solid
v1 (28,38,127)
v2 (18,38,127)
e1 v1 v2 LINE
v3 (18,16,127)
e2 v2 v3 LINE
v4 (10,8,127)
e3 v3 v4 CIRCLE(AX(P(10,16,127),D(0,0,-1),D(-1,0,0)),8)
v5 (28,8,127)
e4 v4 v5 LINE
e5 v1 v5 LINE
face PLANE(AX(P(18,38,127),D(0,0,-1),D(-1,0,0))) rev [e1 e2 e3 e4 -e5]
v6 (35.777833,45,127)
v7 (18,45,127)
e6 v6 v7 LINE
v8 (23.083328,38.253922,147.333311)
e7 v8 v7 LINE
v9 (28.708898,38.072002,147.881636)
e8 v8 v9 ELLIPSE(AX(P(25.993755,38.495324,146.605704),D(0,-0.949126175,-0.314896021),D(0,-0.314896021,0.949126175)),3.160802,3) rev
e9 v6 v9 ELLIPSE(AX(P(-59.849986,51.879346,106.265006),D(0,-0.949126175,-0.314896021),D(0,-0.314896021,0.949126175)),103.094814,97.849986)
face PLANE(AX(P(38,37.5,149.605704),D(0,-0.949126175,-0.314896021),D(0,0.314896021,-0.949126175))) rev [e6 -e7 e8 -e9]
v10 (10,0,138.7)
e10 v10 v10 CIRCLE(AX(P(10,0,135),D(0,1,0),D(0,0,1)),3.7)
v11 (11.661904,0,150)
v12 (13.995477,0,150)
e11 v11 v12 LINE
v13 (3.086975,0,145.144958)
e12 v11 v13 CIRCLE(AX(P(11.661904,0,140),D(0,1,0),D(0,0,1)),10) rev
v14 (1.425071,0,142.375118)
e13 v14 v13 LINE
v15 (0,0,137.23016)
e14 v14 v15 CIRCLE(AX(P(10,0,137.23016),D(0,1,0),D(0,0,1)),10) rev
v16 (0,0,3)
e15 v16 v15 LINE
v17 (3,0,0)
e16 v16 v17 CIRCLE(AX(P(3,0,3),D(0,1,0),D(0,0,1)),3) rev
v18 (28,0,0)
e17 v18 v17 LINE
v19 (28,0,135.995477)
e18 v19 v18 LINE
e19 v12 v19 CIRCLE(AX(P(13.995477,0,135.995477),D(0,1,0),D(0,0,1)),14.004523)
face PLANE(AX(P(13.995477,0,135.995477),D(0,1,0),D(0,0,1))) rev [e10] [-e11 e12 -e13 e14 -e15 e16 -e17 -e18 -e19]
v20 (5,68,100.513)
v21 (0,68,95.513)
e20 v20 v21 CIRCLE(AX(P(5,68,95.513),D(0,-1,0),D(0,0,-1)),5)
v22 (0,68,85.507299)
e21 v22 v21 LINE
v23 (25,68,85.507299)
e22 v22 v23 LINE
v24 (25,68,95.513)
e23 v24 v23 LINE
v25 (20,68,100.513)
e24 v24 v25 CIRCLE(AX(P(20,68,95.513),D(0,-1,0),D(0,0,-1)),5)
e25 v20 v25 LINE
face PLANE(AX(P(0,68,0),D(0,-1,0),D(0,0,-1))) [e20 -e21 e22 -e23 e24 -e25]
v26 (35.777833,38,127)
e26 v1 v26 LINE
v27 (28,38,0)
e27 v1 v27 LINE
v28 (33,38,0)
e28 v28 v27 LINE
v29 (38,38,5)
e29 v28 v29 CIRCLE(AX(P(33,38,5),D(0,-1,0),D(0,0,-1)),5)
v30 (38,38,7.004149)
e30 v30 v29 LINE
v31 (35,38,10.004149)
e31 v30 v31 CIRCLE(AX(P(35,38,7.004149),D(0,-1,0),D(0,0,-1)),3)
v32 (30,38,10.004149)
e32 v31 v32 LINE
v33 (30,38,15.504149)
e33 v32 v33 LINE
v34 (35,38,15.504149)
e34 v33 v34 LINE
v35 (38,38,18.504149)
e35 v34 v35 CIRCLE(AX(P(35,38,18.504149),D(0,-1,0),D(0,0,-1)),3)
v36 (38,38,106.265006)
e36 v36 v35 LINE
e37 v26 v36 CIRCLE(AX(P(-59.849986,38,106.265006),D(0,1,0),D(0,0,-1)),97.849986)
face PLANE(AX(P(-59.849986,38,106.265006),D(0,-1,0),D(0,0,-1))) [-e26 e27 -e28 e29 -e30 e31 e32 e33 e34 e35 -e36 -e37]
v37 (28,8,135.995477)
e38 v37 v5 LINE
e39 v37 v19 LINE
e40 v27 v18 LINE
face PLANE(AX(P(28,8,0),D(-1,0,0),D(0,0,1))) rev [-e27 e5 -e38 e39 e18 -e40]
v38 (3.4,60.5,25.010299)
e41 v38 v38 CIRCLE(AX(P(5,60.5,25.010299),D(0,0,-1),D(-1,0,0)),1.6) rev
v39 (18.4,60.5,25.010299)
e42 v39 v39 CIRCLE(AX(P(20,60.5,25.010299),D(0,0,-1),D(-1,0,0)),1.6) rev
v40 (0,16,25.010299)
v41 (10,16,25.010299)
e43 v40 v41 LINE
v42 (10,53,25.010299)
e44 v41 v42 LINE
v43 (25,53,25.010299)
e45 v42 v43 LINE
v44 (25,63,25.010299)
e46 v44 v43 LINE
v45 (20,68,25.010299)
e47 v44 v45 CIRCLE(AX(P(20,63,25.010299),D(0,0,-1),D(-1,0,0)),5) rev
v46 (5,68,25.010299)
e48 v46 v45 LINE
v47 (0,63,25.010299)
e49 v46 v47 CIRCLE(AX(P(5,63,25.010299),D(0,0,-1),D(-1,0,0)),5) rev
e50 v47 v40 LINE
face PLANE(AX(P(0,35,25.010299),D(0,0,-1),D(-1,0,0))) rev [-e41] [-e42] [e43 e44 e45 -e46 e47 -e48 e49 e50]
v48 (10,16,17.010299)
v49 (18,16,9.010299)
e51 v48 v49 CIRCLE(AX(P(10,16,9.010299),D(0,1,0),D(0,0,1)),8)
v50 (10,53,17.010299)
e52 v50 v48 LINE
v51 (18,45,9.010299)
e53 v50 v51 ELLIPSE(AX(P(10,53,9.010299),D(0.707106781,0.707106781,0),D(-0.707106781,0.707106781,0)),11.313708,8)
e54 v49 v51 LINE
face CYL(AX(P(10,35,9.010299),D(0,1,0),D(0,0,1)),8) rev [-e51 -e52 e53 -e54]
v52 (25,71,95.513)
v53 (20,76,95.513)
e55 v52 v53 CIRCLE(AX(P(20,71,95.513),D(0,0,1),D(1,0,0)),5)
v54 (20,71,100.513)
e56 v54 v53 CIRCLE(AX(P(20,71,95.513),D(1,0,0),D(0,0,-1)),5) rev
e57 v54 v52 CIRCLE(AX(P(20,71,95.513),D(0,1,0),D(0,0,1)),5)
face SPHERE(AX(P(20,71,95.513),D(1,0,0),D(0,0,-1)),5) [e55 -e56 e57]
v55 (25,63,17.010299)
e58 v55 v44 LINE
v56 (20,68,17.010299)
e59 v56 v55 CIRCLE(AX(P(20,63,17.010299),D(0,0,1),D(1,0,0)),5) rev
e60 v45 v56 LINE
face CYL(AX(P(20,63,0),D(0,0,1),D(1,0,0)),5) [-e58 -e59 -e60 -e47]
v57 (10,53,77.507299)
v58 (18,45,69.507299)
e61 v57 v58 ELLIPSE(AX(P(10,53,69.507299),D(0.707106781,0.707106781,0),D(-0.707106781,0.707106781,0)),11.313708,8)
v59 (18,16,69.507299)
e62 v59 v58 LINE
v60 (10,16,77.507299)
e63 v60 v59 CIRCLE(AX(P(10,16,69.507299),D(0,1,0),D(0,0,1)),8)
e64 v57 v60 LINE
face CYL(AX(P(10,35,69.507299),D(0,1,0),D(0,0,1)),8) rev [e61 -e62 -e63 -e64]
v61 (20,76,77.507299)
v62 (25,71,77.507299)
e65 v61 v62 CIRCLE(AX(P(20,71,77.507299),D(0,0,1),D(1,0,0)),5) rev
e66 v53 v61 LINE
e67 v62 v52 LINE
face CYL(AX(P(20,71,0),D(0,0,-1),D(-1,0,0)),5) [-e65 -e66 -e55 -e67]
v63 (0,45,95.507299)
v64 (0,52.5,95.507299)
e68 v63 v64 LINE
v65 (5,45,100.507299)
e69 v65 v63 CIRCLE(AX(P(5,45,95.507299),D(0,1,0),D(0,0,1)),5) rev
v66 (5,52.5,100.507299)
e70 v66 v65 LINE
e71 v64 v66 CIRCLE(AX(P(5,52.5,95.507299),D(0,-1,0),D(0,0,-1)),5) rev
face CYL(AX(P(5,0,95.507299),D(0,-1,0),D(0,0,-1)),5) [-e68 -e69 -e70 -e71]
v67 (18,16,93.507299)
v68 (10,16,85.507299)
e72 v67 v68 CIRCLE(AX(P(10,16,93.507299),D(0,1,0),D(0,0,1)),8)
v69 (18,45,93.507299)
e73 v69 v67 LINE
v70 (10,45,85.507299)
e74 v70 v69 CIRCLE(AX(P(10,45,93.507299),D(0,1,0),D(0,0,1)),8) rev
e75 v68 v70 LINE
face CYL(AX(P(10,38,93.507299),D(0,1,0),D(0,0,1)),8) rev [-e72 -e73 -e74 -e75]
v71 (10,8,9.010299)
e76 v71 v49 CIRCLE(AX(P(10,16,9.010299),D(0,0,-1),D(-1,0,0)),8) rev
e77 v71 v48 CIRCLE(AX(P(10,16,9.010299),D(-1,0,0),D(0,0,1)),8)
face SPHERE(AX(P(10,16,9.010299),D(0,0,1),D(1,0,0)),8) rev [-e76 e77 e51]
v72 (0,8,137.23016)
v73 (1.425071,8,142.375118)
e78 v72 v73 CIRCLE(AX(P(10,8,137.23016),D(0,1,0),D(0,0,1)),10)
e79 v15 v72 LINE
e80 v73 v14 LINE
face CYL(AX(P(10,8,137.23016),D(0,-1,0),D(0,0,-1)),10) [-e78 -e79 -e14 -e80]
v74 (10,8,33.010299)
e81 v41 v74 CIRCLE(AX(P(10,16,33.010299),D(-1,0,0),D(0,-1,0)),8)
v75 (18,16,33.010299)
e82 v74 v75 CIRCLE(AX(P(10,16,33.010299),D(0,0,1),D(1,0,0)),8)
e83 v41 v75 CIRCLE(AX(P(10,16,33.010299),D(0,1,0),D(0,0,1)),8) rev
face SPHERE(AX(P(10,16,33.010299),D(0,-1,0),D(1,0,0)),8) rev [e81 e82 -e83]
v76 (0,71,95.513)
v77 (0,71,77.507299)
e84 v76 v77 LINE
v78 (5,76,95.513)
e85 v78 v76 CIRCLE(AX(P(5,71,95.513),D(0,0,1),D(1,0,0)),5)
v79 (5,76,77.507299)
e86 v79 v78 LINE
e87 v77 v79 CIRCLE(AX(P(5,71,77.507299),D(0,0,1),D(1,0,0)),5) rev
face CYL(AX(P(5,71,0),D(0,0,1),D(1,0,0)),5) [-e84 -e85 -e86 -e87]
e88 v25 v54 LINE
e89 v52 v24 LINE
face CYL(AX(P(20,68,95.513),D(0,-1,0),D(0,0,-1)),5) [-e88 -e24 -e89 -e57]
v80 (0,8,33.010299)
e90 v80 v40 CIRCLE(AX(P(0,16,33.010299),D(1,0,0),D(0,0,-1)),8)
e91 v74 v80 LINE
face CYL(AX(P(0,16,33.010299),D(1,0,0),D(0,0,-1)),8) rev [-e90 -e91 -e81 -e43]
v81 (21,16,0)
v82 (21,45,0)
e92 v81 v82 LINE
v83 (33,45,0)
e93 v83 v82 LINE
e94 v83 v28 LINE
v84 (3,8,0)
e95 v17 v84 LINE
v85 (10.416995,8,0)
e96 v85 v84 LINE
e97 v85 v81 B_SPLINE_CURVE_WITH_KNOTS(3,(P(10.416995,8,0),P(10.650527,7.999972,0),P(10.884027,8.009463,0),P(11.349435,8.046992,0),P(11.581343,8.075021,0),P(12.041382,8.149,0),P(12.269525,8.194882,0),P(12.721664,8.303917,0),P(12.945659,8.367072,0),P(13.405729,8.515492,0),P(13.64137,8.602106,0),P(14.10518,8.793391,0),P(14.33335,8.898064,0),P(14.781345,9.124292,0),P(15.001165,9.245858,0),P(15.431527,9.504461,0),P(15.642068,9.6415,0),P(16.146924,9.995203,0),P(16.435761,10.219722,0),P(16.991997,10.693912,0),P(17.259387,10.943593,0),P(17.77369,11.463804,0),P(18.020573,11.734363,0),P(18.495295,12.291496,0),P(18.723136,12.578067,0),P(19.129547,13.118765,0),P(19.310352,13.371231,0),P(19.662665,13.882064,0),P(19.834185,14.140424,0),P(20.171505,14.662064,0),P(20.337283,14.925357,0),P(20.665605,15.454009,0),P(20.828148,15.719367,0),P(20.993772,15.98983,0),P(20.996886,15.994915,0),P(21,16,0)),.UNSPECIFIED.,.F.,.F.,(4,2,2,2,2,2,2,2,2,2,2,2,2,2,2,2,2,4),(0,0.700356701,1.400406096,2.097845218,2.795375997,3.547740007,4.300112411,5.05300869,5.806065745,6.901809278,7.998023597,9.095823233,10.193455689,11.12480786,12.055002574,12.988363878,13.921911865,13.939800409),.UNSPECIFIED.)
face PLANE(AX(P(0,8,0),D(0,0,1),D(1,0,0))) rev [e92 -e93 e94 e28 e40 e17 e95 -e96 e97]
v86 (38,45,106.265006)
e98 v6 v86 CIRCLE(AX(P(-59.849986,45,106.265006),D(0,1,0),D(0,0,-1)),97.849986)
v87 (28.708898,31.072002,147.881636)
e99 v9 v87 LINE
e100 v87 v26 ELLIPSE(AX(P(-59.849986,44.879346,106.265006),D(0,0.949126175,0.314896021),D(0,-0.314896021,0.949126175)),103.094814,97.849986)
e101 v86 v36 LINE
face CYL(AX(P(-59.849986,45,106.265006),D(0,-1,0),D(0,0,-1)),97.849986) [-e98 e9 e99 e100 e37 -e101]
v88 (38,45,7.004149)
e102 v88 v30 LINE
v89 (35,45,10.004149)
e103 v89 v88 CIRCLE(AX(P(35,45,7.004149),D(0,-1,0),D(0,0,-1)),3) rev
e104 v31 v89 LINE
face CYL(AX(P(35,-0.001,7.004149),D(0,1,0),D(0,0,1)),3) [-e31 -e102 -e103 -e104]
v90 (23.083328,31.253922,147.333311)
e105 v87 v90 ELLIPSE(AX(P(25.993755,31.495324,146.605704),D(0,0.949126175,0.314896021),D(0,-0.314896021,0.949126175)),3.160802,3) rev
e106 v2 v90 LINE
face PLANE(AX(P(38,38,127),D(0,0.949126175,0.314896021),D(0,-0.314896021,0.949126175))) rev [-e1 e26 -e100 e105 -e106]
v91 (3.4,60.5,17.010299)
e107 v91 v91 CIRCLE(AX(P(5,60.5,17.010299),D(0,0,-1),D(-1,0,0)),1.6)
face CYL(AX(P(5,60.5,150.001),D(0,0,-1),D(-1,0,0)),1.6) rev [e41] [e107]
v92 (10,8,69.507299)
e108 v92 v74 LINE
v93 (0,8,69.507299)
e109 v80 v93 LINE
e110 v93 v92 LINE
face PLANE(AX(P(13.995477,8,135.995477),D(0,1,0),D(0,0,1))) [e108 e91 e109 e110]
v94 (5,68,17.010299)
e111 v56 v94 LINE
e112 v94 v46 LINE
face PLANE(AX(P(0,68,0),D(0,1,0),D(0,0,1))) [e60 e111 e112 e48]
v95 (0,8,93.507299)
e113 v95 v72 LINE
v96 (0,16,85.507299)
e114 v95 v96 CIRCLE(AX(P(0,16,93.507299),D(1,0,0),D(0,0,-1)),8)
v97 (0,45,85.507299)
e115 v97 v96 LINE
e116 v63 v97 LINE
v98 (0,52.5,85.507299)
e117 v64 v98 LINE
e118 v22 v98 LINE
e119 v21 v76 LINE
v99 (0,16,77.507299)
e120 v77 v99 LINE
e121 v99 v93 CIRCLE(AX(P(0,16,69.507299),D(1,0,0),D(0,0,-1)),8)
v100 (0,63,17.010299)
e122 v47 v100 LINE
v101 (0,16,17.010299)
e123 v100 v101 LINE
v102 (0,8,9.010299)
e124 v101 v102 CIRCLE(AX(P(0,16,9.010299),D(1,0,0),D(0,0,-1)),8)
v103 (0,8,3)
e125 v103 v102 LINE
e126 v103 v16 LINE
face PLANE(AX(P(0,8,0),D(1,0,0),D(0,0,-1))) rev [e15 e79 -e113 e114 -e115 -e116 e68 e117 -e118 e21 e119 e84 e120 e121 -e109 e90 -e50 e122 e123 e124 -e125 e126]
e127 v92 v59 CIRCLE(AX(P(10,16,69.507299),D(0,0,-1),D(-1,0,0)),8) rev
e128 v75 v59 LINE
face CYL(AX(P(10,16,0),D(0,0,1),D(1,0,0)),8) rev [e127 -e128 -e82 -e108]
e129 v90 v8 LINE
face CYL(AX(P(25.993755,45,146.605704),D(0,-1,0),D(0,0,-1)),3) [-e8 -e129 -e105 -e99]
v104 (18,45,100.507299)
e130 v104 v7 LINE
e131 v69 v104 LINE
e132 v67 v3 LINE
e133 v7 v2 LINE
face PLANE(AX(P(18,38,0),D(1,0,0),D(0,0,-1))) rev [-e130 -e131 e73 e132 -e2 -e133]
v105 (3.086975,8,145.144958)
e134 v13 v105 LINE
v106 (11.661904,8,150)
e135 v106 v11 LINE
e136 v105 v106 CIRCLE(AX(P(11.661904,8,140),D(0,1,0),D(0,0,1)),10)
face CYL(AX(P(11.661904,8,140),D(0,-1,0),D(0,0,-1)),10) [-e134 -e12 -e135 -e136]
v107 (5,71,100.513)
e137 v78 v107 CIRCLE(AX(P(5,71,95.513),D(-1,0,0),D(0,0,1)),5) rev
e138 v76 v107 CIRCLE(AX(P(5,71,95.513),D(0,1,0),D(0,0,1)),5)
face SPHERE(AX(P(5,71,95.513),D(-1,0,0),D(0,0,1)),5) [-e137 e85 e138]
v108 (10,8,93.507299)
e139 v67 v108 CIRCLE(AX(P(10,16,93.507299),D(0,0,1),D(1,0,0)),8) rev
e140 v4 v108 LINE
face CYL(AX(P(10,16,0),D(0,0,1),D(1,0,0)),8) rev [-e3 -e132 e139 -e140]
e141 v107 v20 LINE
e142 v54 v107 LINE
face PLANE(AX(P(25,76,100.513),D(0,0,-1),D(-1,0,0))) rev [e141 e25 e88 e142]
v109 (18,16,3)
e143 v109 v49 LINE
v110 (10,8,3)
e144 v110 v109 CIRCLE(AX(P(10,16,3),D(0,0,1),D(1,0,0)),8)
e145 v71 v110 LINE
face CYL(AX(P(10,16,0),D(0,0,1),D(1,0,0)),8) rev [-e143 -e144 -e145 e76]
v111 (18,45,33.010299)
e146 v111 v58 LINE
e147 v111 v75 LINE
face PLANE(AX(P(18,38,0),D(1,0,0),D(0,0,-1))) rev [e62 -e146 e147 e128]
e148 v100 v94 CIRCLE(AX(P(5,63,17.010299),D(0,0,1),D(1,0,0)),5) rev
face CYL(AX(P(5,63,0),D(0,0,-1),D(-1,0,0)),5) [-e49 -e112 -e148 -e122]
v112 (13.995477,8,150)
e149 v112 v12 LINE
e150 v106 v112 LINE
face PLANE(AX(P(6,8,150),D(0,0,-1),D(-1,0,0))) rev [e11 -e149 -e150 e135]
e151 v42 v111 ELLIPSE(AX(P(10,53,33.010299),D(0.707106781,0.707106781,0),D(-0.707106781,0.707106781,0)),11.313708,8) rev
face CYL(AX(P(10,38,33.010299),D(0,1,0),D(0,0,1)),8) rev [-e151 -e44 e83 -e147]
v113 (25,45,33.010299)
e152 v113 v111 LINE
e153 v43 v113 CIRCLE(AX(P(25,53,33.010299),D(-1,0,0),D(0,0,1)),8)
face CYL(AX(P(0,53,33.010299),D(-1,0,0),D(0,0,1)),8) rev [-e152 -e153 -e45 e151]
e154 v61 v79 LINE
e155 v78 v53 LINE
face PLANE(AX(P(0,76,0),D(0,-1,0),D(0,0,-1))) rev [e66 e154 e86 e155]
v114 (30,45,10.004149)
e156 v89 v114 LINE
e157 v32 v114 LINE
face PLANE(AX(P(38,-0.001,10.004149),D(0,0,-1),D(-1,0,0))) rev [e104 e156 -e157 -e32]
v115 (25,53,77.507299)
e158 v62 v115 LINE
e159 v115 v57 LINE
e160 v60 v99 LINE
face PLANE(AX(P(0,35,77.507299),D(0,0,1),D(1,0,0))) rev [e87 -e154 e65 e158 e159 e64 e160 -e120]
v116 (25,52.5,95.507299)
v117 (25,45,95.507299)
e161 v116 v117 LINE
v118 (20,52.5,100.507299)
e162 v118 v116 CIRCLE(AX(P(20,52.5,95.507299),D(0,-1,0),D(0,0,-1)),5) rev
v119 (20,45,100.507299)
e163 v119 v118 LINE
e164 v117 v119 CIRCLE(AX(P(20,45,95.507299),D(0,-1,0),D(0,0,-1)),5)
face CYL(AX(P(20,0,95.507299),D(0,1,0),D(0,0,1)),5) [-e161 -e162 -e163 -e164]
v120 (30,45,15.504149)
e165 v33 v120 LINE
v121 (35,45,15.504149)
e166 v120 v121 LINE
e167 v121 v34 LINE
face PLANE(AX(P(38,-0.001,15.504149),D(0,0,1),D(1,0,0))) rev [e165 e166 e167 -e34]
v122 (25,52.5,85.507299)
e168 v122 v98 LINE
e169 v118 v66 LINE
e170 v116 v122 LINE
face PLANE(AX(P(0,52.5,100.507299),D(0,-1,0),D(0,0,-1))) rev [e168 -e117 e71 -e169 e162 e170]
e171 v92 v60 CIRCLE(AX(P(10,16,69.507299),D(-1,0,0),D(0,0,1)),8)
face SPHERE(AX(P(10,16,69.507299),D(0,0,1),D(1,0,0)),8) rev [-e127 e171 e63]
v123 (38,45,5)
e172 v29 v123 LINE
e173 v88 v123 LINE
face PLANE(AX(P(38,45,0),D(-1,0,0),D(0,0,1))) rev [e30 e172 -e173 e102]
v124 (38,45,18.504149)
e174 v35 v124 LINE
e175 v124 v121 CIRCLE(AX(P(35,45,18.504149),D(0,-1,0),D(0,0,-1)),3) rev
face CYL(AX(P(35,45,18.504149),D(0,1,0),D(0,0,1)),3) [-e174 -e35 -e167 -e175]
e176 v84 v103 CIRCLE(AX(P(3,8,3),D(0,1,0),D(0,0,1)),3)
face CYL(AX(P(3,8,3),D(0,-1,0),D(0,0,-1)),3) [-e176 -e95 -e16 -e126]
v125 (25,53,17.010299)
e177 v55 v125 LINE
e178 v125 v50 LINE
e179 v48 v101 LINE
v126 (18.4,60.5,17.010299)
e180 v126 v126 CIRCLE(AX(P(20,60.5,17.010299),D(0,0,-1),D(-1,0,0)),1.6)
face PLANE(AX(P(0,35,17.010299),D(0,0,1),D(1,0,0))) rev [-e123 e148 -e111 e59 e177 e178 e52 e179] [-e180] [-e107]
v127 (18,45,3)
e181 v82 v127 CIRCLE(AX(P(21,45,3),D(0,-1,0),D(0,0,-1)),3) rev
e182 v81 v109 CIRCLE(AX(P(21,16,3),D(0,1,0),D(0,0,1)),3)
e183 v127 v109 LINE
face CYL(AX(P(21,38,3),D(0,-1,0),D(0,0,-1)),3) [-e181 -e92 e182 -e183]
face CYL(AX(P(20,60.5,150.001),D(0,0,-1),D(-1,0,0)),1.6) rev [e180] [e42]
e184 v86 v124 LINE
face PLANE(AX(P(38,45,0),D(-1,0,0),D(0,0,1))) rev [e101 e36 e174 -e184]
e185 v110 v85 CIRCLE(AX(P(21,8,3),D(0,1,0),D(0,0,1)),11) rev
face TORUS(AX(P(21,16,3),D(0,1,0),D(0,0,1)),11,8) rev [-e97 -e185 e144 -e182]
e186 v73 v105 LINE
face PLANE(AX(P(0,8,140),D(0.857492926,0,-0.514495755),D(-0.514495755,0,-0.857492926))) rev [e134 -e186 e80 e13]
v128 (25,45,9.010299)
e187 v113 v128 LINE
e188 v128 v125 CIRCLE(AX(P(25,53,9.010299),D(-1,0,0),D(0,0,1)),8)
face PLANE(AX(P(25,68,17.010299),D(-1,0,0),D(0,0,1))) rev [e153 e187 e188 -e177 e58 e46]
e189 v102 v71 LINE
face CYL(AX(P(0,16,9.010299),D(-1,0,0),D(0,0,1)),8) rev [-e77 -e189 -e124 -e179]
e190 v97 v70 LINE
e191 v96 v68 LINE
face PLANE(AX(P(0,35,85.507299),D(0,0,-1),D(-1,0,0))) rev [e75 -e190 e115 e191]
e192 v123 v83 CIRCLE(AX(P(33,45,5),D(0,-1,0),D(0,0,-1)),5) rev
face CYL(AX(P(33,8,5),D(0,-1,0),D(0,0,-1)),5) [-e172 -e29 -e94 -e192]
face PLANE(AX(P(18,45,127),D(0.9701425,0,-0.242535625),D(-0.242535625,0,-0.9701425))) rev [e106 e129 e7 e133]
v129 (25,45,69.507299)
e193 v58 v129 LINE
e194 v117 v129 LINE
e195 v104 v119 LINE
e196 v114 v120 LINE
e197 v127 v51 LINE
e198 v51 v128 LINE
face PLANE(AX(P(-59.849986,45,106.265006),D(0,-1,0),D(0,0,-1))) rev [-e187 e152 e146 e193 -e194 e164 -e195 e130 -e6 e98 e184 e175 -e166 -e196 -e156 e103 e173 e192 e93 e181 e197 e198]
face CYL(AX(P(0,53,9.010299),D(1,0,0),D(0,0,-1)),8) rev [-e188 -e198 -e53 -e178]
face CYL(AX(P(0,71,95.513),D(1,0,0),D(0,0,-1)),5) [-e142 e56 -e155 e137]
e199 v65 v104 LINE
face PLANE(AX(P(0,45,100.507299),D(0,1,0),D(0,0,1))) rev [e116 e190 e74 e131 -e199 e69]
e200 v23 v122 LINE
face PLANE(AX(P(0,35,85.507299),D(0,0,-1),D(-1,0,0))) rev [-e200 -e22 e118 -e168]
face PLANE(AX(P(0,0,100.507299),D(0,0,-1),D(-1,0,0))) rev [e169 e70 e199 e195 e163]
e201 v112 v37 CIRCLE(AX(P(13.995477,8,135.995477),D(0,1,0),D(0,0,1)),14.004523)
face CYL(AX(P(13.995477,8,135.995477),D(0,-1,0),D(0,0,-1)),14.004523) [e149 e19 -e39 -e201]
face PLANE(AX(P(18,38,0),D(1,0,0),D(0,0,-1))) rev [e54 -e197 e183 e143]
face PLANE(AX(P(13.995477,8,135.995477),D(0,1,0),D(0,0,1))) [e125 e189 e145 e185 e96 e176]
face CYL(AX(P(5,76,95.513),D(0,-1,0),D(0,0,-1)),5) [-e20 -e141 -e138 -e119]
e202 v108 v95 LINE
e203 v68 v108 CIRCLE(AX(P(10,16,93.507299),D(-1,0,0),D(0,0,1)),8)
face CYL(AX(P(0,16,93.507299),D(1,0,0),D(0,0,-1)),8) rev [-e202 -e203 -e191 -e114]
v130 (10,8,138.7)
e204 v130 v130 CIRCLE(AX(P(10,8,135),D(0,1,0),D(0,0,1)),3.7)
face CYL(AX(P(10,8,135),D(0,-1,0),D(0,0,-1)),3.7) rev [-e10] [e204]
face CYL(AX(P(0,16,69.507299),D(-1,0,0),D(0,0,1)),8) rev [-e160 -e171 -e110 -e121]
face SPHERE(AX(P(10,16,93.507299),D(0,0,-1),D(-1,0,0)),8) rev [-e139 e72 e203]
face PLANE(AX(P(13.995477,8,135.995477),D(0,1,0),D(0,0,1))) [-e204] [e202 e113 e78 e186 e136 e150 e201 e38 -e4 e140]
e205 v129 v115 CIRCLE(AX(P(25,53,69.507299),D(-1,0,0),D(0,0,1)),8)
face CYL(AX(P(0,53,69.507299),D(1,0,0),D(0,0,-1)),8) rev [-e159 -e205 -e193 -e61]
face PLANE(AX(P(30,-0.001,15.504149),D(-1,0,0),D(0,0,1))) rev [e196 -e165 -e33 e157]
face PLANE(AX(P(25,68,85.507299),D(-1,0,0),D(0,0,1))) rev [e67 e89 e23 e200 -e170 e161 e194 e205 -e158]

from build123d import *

# Parameters (mm, degrees)
SKETCH1_R           = 3.7
BOSS_EXTRUDE1_DEPTH = 8
FILLET1_R           = 10
SKETCH2_W           = 10
SKETCH2_H           = 127
BOSS_EXTRUDE2_DEPTH = 30
BOSS_EXTRUDE3_DEPTH = 7
FILLET2_R           = 3
SKETCH4_W           = 18
SKETCH4_H           = 8
BOSS_EXTRUDE4_DEPTH = 27
SKETCH5_W           = 25
SKETCH5_H           = 8
BOSS_EXTRUDE5_DEPTH = 33
SKETCH6_W           = 25
SKETCH6_H           = 23.005701243
BOSS_EXTRUDE6_DEPTH = 8
SKETCH7_W           = 25
SKETCH7_H           = 7.5
BOSS_EXTRUDE7_DEPTH = 15
CUT_EXTRUDE1_REACH  = 159.817
SKETCH8_R           = 1.6
FILLET3_R           = 8
FILLET4_R           = 5
CUT_EXTRUDE2_REACH  = 163.149
SKETCH9_W           = 8
SKETCH9_H           = 5.5
FILLET7_R           = 3
BOSS_EXTRUDE8_DEPTH = 10
CUT_EXTRUDE3_START  = -17.777833
CUT_EXTRUDE3_DEPTH  = 17.777833


with BuildPart() as part:
    # Sketch1 → Boss-Extrude1 (new body)
    with BuildSketch(Plane(origin=(0, 0, 0), x_dir=(1, 0, 0), z_dir=(0, 1, 0))):
        with BuildLine():
            Line((0, 0), (0, -140))
            Line((0, -140), (6, -150))
            Line((6, -150), (13.995477091, -150))
            ThreePointArc((13.995477091, -150), (23.898170207, -145.898170207), (28, -135.995477091))
            Line((28, -135.995477091), (28, 0))
            Line((28, 0), (0, 0))
        make_face()
        with Locations(Location((10, -135, 0), (0, 0, 270))):
            Circle(SKETCH1_R, mode=Mode.SUBTRACT)
    extrude(amount=BOSS_EXTRUDE1_DEPTH)

    # Fillet1
    fillet1_edges = [part.edges().sort_by_distance(p)[0] for p in [
        (6, 4, 150),
        (0, 4, 140),
    ]]
    fillet(fillet1_edges, radius=FILLET1_R)

    # Sketch2 → Boss-Extrude2 (add)
    with BuildSketch(Plane(origin=(0, 8, 0), x_dir=(1, 0, 0), z_dir=(0, 1, 0))):
        with Locations((23, -63.5)):
            Rectangle(SKETCH2_W, SKETCH2_H)
    extrude(amount=BOSS_EXTRUDE2_DEPTH)

    # Sketch3 → Boss-Extrude3 (add)
    with BuildSketch(Plane(origin=(0, 38, 0), x_dir=(1, 0, 0), z_dir=(0, 1, 0))):
        with BuildLine():
            Line((18, 0), (38, 0))
            Line((38, 0), (38, -106.265006005))
            ThreePointArc((38, -106.265006005), (34.694156342, -131.484540297), (25, -155))
            Line((25, -155), (18, -127))
            Line((18, -127), (18, 0))
        make_face()
    extrude(amount=BOSS_EXTRUDE3_DEPTH)

    # Fillet2
    fillet2_edges = [part.edges().sort_by_distance(p)[0] for p in [
        (0, 4, 0),
        (18, 26.5, 0),
        (25, 41.5, 155),
    ]]
    fillet(fillet2_edges, radius=FILLET2_R)

    # Sketch4 → Boss-Extrude4 (add)
    with BuildSketch(Plane(origin=(0, 8, 0), x_dir=(1, 0, 0), z_dir=(0, 1, 0))):
        with Locations((9, -21.010298757)):
            Rectangle(SKETCH4_W, SKETCH4_H)
        with Locations((9, -81.507298757)):
            Rectangle(SKETCH4_W, SKETCH4_H)
    extrude(amount=BOSS_EXTRUDE4_DEPTH)

    # Sketch5 → Boss-Extrude5 (add)
    with BuildSketch(Plane(origin=(0, 35, 0), x_dir=(1, 0, 0), z_dir=(0, 1, 0))):
        with Locations((12.5, -21.010298757)):
            Rectangle(SKETCH5_W, SKETCH5_H)
        with Locations((12.5, -81.507298757)):
            Rectangle(SKETCH5_W, SKETCH5_H)
    extrude(amount=BOSS_EXTRUDE5_DEPTH)

    # Sketch6 → Boss-Extrude6 (add)
    with BuildSketch(Plane(origin=(0, 68, 0), x_dir=(1, 0, 0), z_dir=(0, 1, 0))):
        with Locations((12.5, -89.010149379)):
            Rectangle(SKETCH6_W, SKETCH6_H)
    extrude(amount=BOSS_EXTRUDE6_DEPTH)

    # Sketch7 → Boss-Extrude7 (add)
    with BuildSketch(Plane.XY.offset(85.507298757)):
        with Locations((12.5, 48.75)):
            Rectangle(SKETCH7_W, SKETCH7_H)
    extrude(amount=BOSS_EXTRUDE7_DEPTH)

    # Sketch8 → Cut-Extrude1 (cut, up to next)
    with BuildSketch(Plane(origin=(0, 0, 17.010298757), x_dir=(-1, 0, 0), z_dir=(0, 0, -1)), mode=Mode.PRIVATE) as cut_extrude1_sk1:
        with Locations((-20, 60.5)):
            Circle(SKETCH8_R)
    cut_extrude1_tool1 = extrude(cut_extrude1_sk1.sketch, amount=-CUT_EXTRUDE1_REACH, mode=Mode.PRIVATE) & part.part
    # Sketch8 → Cut-Extrude1 (cut, up to next)
    with BuildSketch(Plane(origin=(0, 0, 17.010298757), x_dir=(-1, 0, 0), z_dir=(0, 0, -1)), mode=Mode.PRIVATE) as cut_extrude1_sk2:
        with Locations((-5, 60.5)):
            Circle(SKETCH8_R)
    cut_extrude1_tool2 = extrude(cut_extrude1_sk2.sketch, amount=-CUT_EXTRUDE1_REACH, mode=Mode.PRIVATE) & part.part
    add(cut_extrude1_tool1.solids().sort_by_distance((20, 60.5, 17.010299))[0], mode=Mode.SUBTRACT)
    add(cut_extrude1_tool2.solids().sort_by_distance((5, 60.5, 17.010299))[0], mode=Mode.SUBTRACT)

    # Fillet3
    fillet3_edges = [part.edges().sort_by_distance(p)[0] for p in [
        (18.878679656, 8, 0.878679656),
        (18, 8, 10.005149379),
    ]]
    fillet(fillet3_edges, radius=FILLET3_R)
    fillet3_2_edges = [part.edges().sort_by_distance(p)[0] for p in [
        (5, 8, 17.010298757),
    ]]
    fillet(fillet3_2_edges, radius=FILLET3_R)
    fillet3_3_edges = [part.edges().sort_by_distance(p)[0] for p in [
        (21.5, 45, 17.010298757),
    ]]
    fillet(fillet3_3_edges, radius=FILLET3_R)
    fillet3_4_edges = [part.edges().sort_by_distance(p)[0] for p in [
        (18, 26.5, 25.010298757),
    ]]
    fillet(fillet3_4_edges, radius=FILLET3_R)
    fillet3_5_edges = [part.edges().sort_by_distance(p)[0] for p in [
        (5, 8, 25.010298757),
    ]]
    fillet(fillet3_5_edges, radius=FILLET3_R)
    fillet3_6_edges = [part.edges().sort_by_distance(p)[0] for p in [
        (21.5, 45, 25.010298757),
    ]]
    fillet(fillet3_6_edges, radius=FILLET3_R)
    fillet3_7_edges = [part.edges().sort_by_distance(p)[0] for p in [
        (5, 8, 77.507298757),
    ]]
    fillet(fillet3_7_edges, radius=FILLET3_R)
    fillet3_8_edges = [part.edges().sort_by_distance(p)[0] for p in [
        (21.5, 45, 77.507298757),
    ]]
    fillet(fillet3_8_edges, radius=FILLET3_R)
    fillet3_9_edges = [part.edges().sort_by_distance(p)[0] for p in [
        (9, 8, 85.507298757),
    ]]
    fillet(fillet3_9_edges, radius=FILLET3_R)
    fillet3_10_edges = [part.edges().sort_by_distance(p)[0] for p in [
        (18, 30.5, 85.507298757),
    ]]
    fillet(fillet3_10_edges, radius=FILLET3_R)

    # Fillet4
    fillet4_edges = [part.edges().sort_by_distance(p)[0] for p in [
        (38, 41.5, 0),
        (25, 68, 21.010298757),
        (25, 76, 89.010149379),
        (0, 76, 89.010149379),
        (0, 68, 21.010298757),
        (12.5, 76, 100.513),
        (25, 72, 100.513),
        (0, 72, 100.513),
        (25, 48.75, 100.507298757),
        (0, 48.75, 100.507298757),
    ]]
    fillet(fillet4_edges, radius=FILLET4_R)

    # Sketch9 → Cut-Extrude2 (cut, up to next)
    with BuildSketch(Plane(origin=(0, 45, 0), x_dir=(1, 0, 0), z_dir=(0, 1, 0)), mode=Mode.PRIVATE) as cut_extrude2_sk1:
        with Locations((34, -12.754149379)):
            Rectangle(SKETCH9_W, SKETCH9_H)
    cut_extrude2_tool1 = extrude(cut_extrude2_sk1.sketch, amount=-CUT_EXTRUDE2_REACH, mode=Mode.PRIVATE) & part.part
    add(cut_extrude2_tool1.solids().sort_by_distance((34, 45, 12.754149))[0], mode=Mode.SUBTRACT)

    # Fillet7
    fillet7_edges = [part.edges().sort_by_distance(p)[0] for p in [
        (38, 41.5, 10.004149379),
        (38, 41.5, 15.504149379),
    ]]
    fillet(fillet7_edges, radius=FILLET7_R)

    # Sketch10 → Boss-Extrude8 (add)
    with BuildSketch(Plane.XZ.offset(-38)):
        with BuildLine():
            Line((18, 127), (28, 127))
            Line((28, 127), (35.777833095, 127))
            ThreePointArc((35.777833095, 127), (32.833324538, 137.640533241), (28.708897726, 147.881635807))
            ThreePointArc((28.708897726, 147.881635807), (25.702724236, 149.591554326), (23.08332777, 147.333311082))
            Line((23.08332777, 147.333311082), (18, 127))
        make_face()
    extrude(amount=BOSS_EXTRUDE8_DEPTH)

    # Sketch11 → Cut-Extrude3 (cut)
    with BuildSketch(Plane.ZY.offset(-18).offset(CUT_EXTRUDE3_START)):
        Polygon((127, 28), (127, 38), (149.605704206, 30.5), (149.605704206, 28), align=None)
        Polygon((149.605704206, 45), (149.605704206, 37.5), (127, 45), align=None)
    extrude(amount=CUT_EXTRUDE3_DEPTH, mode=Mode.SUBTRACT)


solid = part.part
